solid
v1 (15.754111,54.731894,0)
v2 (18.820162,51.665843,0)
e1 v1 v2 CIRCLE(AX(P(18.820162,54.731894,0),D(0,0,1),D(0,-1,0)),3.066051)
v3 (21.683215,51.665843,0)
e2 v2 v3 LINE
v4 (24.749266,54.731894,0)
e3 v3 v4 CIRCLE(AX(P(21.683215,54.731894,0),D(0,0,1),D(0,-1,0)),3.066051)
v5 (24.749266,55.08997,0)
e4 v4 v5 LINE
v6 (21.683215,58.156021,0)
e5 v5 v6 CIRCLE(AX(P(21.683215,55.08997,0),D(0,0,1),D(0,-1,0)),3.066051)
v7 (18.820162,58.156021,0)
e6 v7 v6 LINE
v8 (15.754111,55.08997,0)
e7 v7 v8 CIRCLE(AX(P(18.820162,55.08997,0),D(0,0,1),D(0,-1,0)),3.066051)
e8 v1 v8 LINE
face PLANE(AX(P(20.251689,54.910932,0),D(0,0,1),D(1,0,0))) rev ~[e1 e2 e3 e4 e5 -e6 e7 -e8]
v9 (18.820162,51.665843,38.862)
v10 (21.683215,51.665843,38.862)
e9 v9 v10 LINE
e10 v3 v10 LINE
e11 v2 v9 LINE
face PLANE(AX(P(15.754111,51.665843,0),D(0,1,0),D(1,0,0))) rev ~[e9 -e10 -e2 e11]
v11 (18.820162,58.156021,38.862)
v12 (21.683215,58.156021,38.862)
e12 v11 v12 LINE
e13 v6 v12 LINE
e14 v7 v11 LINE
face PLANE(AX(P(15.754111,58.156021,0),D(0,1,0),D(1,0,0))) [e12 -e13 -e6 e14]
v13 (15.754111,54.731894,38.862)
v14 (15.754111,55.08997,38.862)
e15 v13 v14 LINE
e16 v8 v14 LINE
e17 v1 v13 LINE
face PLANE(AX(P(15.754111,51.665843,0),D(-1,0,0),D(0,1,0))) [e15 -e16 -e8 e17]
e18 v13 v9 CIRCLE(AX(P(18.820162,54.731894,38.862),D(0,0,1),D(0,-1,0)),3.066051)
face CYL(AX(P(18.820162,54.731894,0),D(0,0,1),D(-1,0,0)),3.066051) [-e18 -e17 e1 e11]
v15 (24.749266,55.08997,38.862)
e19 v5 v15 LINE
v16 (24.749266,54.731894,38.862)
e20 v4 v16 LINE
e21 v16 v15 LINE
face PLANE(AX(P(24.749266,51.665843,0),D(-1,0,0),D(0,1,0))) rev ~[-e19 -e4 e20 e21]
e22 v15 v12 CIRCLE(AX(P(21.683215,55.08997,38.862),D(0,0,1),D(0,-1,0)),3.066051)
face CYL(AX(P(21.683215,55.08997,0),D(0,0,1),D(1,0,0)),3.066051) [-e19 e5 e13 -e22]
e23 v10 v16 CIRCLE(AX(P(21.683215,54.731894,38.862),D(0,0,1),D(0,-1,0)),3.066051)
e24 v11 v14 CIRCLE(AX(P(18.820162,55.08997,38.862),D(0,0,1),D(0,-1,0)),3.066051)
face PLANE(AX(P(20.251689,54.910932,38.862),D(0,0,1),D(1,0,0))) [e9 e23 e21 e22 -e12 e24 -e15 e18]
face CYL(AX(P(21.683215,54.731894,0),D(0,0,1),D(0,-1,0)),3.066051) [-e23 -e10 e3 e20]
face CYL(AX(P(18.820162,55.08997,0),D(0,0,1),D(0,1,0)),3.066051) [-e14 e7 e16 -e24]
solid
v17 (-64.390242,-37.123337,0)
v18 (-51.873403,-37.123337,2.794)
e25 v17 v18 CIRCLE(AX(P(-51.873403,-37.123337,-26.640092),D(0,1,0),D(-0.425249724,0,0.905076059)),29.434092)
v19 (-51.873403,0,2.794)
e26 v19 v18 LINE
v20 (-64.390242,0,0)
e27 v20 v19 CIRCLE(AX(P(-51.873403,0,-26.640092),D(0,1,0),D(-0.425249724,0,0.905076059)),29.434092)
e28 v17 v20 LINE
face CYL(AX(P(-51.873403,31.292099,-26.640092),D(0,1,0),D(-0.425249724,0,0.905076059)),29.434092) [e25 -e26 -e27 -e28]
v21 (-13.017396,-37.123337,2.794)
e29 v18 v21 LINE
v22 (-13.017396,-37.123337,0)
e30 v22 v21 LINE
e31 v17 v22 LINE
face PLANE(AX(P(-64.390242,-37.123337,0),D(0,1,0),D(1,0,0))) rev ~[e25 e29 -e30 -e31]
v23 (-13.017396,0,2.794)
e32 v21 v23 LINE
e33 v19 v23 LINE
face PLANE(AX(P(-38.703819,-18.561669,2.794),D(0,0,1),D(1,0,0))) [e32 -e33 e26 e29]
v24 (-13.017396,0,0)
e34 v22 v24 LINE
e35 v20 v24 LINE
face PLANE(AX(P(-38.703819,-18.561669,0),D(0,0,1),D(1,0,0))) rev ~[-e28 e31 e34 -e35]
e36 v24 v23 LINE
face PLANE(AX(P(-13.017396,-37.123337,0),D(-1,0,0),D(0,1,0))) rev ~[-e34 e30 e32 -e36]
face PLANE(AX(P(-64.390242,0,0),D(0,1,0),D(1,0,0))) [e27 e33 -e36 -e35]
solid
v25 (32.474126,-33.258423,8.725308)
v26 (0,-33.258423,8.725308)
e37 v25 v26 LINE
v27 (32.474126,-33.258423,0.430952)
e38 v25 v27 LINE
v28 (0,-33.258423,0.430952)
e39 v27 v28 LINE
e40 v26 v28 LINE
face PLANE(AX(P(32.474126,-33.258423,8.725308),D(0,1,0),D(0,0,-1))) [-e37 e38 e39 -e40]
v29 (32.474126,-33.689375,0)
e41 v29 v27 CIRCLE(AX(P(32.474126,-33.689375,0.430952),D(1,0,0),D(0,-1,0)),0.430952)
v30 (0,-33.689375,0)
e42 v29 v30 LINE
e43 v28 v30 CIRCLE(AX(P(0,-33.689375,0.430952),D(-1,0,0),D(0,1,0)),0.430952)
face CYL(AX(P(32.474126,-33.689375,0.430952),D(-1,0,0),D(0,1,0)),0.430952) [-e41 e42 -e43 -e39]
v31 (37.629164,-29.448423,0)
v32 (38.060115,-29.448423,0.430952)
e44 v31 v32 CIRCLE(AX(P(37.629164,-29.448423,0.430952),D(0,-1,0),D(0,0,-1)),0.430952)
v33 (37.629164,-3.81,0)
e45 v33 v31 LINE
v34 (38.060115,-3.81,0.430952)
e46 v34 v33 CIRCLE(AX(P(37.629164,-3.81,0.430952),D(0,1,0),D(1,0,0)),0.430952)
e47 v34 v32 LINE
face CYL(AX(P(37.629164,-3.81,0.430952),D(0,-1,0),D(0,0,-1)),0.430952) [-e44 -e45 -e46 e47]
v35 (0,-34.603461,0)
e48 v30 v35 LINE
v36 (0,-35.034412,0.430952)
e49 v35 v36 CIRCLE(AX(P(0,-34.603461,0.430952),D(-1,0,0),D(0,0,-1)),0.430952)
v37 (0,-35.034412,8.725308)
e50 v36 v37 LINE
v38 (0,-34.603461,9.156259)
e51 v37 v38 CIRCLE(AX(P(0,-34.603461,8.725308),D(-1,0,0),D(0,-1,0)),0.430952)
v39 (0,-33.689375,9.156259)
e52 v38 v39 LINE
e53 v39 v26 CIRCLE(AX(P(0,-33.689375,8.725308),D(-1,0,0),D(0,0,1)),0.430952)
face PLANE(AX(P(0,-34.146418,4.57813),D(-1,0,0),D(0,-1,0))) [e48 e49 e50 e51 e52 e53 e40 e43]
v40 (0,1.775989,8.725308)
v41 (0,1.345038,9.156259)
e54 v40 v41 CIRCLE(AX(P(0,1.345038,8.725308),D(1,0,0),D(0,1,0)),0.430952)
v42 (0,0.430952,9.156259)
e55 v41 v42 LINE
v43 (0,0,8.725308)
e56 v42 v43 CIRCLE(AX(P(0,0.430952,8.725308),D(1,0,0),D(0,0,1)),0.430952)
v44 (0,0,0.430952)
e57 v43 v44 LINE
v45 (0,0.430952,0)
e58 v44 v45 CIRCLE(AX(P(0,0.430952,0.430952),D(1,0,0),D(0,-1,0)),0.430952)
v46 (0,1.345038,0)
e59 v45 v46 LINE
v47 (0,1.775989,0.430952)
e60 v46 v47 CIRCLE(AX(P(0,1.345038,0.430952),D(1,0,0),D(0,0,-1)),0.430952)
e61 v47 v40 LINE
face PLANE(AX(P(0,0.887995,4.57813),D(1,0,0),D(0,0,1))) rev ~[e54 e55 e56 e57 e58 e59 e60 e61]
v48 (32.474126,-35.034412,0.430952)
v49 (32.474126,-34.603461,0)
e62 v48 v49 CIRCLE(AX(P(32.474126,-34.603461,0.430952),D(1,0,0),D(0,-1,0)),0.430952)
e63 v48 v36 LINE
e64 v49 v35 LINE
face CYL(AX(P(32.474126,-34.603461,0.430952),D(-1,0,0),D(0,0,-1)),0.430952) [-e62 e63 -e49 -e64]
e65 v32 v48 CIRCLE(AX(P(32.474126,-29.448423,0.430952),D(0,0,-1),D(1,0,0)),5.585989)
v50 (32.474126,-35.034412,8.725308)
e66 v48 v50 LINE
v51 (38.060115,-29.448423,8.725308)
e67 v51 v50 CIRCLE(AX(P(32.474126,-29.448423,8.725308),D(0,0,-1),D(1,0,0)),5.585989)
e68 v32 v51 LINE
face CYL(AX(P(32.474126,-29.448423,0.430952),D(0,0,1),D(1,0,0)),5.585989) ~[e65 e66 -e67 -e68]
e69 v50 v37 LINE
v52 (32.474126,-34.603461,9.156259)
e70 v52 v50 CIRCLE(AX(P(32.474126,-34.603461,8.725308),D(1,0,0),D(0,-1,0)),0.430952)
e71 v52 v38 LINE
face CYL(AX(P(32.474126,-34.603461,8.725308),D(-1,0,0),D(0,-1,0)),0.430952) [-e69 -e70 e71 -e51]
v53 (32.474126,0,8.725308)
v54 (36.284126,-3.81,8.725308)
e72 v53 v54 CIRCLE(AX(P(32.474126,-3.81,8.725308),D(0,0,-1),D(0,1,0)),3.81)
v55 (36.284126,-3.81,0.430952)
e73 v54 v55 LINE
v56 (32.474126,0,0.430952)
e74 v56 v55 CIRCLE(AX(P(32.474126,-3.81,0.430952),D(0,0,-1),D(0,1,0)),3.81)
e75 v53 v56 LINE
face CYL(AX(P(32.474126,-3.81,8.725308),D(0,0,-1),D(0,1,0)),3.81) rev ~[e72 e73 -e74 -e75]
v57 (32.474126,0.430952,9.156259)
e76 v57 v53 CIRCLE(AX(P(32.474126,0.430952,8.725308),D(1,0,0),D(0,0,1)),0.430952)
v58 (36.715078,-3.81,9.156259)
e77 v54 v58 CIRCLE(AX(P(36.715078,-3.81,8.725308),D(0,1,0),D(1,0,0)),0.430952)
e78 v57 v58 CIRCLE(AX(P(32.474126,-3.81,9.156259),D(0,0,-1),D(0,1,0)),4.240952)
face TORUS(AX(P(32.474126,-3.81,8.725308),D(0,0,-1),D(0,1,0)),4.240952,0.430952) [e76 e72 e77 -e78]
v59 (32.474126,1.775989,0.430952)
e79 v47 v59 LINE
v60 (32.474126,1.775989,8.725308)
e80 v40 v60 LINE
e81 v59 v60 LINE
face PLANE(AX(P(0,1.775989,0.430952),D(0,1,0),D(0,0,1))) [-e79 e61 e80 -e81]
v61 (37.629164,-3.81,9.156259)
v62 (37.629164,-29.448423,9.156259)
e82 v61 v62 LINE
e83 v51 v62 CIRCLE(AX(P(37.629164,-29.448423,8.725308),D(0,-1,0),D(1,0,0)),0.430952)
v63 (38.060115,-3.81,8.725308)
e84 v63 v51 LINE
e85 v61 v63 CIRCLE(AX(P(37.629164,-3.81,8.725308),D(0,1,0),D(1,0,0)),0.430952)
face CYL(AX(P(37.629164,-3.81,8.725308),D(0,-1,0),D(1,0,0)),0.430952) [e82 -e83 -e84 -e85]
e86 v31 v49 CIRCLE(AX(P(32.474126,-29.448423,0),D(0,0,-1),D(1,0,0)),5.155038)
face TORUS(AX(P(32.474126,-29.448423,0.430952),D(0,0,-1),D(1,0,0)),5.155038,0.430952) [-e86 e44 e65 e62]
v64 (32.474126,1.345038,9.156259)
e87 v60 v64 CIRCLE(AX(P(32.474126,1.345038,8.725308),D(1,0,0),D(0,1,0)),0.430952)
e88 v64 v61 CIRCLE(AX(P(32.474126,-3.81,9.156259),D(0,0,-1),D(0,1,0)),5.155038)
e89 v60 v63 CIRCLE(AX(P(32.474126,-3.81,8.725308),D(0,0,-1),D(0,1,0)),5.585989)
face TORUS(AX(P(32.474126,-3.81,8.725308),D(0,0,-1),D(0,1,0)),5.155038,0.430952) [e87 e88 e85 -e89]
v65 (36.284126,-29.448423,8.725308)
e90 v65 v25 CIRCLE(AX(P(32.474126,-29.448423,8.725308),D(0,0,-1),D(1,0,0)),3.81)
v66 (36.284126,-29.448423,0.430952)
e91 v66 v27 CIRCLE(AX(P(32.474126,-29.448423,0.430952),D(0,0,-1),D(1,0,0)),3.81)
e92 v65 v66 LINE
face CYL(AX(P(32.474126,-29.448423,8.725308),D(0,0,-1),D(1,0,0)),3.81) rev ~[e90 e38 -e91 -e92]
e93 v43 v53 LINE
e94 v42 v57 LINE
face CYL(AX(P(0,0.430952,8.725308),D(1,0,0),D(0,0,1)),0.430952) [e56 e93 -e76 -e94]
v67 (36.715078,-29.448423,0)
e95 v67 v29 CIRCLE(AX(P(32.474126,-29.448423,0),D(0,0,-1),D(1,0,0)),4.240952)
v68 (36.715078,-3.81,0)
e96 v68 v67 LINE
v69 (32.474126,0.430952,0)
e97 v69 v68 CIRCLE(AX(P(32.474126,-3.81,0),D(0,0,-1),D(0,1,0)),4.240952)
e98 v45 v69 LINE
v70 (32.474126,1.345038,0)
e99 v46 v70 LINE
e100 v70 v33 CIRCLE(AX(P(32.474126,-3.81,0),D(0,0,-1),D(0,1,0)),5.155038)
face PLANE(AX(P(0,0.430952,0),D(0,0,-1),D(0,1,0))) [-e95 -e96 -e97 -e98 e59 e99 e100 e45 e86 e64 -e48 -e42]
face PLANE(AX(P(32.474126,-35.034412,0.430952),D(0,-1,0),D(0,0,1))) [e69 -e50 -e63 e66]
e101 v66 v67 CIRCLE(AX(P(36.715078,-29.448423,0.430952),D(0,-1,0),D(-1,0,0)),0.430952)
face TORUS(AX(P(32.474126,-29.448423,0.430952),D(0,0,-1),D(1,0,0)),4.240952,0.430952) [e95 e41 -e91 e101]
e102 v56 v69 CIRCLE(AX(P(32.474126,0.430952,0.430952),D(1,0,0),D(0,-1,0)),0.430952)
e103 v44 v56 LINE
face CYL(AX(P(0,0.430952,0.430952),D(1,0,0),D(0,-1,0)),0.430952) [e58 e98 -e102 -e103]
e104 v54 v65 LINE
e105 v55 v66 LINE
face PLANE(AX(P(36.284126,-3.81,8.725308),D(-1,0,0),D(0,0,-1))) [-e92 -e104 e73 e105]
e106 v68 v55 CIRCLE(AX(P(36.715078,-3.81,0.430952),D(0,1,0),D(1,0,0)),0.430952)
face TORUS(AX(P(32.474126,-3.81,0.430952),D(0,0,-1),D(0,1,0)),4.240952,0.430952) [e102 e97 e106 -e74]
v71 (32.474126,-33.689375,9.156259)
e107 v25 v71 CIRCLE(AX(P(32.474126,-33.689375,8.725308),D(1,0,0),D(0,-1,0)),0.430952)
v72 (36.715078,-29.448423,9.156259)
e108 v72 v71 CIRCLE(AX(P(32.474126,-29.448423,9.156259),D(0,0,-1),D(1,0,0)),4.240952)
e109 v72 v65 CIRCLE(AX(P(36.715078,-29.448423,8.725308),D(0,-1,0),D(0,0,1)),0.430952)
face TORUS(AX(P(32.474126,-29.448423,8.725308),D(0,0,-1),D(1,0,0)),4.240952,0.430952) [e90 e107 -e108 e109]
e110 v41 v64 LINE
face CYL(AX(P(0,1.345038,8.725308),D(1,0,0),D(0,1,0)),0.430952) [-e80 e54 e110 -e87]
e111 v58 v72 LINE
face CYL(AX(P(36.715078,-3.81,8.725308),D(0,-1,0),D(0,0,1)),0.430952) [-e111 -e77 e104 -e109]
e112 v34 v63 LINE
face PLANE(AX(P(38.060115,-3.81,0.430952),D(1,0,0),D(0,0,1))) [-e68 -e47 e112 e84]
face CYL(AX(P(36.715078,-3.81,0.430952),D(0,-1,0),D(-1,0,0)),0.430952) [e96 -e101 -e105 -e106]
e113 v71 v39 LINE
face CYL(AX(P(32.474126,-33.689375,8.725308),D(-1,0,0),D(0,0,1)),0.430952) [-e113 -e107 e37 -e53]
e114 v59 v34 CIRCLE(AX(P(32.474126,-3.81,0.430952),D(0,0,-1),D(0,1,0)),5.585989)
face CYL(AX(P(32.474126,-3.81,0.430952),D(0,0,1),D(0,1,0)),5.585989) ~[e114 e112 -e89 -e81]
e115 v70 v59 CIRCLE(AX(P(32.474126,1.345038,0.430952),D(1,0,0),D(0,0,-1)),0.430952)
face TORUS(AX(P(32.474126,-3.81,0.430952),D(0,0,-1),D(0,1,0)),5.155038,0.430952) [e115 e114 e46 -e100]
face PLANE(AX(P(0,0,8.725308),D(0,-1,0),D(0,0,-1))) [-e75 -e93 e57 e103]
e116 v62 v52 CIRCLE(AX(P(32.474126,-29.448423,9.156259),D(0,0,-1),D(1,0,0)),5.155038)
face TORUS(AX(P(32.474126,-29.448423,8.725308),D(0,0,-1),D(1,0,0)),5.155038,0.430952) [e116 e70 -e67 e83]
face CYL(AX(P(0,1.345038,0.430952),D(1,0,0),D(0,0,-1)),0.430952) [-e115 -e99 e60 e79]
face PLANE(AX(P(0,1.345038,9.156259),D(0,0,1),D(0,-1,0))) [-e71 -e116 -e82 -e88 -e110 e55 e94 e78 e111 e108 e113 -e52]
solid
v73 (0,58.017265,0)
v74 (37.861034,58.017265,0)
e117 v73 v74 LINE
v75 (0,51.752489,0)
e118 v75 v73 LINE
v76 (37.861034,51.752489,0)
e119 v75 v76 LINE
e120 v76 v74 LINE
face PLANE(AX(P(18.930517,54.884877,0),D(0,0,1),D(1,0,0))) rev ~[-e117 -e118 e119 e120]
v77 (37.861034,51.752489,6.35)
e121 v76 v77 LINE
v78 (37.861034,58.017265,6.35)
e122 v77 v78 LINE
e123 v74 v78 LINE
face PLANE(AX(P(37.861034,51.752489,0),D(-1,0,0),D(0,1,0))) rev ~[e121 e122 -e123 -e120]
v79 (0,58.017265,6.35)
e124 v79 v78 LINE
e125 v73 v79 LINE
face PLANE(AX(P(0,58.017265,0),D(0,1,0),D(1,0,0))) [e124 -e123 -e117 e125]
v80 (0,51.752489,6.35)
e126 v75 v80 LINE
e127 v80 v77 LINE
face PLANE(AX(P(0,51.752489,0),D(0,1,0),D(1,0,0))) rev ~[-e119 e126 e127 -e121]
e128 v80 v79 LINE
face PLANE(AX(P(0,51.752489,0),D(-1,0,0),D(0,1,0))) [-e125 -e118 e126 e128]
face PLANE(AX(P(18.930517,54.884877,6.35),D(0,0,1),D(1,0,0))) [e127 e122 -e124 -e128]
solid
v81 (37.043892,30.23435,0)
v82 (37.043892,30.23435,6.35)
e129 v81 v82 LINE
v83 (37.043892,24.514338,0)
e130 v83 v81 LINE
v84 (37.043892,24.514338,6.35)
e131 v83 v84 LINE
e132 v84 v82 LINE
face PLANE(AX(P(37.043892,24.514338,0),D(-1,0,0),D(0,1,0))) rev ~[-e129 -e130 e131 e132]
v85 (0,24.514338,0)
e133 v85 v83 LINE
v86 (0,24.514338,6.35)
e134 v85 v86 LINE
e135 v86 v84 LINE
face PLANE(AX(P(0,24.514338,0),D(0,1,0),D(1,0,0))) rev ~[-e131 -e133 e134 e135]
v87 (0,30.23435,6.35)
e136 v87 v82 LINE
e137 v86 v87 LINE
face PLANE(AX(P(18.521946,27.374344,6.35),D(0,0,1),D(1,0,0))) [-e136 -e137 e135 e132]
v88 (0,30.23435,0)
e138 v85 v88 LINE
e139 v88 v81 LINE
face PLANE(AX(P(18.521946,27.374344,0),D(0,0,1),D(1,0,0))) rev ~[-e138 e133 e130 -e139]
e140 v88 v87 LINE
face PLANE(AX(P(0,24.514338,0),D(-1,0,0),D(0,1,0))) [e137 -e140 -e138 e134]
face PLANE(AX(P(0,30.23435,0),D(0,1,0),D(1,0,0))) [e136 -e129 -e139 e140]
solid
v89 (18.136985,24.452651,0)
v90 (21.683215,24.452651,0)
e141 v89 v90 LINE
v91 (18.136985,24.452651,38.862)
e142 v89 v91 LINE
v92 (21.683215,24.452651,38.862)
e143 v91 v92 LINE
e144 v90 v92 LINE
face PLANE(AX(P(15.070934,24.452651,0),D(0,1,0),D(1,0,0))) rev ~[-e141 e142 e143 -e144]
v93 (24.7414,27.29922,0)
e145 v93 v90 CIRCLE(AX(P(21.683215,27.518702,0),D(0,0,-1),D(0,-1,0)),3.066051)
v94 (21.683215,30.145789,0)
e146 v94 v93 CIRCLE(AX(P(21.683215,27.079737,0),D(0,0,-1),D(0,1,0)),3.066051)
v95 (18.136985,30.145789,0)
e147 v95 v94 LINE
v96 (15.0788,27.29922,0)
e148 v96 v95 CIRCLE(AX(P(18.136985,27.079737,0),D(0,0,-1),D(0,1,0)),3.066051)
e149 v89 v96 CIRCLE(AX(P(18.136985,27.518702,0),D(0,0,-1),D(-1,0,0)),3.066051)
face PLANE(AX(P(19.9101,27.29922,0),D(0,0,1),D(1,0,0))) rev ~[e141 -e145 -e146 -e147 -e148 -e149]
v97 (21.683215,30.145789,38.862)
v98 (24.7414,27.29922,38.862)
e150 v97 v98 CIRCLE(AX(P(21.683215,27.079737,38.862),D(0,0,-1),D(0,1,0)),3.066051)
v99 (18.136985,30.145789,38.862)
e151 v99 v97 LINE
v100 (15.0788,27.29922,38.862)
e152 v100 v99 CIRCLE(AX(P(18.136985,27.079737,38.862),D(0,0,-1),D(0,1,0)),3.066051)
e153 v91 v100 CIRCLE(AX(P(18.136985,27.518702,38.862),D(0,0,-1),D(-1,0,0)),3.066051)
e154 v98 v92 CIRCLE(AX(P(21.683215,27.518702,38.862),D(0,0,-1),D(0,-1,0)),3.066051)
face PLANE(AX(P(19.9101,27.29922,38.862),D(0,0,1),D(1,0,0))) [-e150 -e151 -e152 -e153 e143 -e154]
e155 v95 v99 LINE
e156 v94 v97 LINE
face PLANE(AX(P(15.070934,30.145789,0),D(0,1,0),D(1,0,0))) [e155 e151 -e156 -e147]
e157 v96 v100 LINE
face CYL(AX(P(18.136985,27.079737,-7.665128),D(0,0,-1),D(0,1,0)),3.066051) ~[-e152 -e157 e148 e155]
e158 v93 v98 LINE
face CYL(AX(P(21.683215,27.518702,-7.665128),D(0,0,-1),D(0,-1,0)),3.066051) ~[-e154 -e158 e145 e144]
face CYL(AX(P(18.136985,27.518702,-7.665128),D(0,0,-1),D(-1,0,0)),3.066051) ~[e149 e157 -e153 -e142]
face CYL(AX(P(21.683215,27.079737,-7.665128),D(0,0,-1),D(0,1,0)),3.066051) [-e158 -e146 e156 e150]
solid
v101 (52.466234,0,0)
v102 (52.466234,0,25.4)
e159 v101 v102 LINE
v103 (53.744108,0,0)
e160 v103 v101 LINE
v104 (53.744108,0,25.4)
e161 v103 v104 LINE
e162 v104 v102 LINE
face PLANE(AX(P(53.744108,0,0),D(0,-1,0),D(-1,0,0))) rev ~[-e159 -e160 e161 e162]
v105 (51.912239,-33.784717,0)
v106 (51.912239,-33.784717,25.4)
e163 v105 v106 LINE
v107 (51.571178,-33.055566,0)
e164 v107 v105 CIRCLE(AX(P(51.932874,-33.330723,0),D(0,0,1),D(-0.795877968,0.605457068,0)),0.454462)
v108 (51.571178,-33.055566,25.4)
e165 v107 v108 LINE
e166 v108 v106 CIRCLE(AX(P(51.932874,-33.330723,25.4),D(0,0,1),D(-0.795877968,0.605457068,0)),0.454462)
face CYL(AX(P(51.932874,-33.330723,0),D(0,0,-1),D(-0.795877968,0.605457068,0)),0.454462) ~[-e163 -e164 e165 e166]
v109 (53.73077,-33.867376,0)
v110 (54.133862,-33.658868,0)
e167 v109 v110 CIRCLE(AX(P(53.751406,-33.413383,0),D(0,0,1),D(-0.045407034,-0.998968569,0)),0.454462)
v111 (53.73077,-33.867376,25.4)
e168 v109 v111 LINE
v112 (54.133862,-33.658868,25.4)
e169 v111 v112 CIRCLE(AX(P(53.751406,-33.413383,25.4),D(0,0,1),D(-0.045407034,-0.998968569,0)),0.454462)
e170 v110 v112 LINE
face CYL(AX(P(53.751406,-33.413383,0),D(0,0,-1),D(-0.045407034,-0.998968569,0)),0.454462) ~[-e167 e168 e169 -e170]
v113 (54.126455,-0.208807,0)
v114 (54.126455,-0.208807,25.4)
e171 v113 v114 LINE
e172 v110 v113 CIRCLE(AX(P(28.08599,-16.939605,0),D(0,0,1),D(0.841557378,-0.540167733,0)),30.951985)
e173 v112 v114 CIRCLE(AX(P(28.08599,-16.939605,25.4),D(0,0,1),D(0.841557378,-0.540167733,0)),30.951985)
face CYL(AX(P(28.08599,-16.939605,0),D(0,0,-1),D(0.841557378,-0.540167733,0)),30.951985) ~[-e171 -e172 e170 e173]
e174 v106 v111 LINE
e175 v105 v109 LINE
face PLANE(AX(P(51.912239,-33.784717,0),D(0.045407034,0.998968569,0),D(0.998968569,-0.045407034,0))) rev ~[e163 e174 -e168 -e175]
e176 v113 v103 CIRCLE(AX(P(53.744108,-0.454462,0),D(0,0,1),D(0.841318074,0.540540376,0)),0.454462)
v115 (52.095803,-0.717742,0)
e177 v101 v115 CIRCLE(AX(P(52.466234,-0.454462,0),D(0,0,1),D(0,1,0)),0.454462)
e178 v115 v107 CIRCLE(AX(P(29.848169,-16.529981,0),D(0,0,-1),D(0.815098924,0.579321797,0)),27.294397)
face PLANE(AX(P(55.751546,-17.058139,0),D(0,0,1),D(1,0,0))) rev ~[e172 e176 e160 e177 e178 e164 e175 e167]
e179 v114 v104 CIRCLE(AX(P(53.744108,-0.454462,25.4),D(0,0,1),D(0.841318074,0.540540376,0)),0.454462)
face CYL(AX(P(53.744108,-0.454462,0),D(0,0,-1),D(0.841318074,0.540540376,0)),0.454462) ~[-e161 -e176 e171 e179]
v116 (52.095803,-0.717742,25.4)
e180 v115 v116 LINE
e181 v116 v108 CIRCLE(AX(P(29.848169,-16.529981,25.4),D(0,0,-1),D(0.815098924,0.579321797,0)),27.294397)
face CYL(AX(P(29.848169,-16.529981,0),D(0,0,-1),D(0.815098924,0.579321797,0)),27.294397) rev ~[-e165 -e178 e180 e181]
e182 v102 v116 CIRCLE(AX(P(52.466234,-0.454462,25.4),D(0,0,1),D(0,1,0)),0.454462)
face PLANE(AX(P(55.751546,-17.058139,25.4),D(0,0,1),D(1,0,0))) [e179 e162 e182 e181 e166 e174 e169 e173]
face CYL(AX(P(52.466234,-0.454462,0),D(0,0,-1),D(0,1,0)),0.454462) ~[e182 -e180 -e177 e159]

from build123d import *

# Parameters (mm, degrees)
F5_DEPTH       = 25.4
F6_W           = 51.3728456572
F6_H           = 37.123337388
F7_DEPTH       = 2.794
F8_T1_DEPTH    = 99.7075344175
F9_W           = 37.8610342741
F9_H           = 6.2647759914
F10_DEPTH      = 6.35
F9_W_2         = 37.0438918471
F9_H_2         = 5.7200118899
F11_W          = 8.9951548725
F11_H          = 6.4901784062
F12_DEPTH      = 38.862
F11_W_2        = 9.6783321351
F11_H_2        = 5.6931376457
F13_F1_R       = 3.0660512242
F13_F2_R       = 3.0660512242
F13_F3_R       = 3.0660512242
F13_F4_R       = 3.0660512242
F13_2_T1_DEPTH = 54.1922561211


# Not quite as in the source:
# - a fillet or chamfer that OpenCascade refuses, or shapes differently, is made with other operations: its cross-section is extruded or revolved along the edge and cut away or added


with BuildPart() as f2:
    # F2: sweep along a path in F0
    with BuildLine(Plane.XY) as f2_path:
        Line((0, 0), (32.4741261244, 0))
        ThreePointArc((32.4741261244, 0), (35.1682029607, -1.1159231637), (36.2841261244, -3.81))
        Line((36.2841261244, -3.81), (36.2841261244, -29.4484232092))
        ThreePointArc((36.2841261244, -29.4484232092), (35.1682029607, -32.1425000455), (32.4741261244, -33.2584232092))
        Line((32.4741261244, -33.2584232092), (0, -33.2584232092))
    # F1 (on Right) → F2 (sweep)
    with BuildSketch(Plane.YZ):
        with BuildLine():
            Line((0, 8.7253075845), (0, 0.43095164))
            ThreePointArc((0, 0.43095164), (0.126222813, 0.126222813), (0.43095164, 0))
            Line((0.43095164, 0), (1.3450375525, 0))
            ThreePointArc((1.3450375525, 0), (1.6497663795, 0.126222813), (1.7759891925, 0.43095164))
            Line((1.7759891925, 0.43095164), (1.7759891925, 8.7253075845))
            ThreePointArc((1.7759891925, 8.7253075845), (1.6497663795, 9.0300364115), (1.3450375525, 9.1562592245))
            Line((1.3450375525, 9.1562592245), (0.43095164, 9.1562592245))
            ThreePointArc((0.43095164, 9.1562592245), (0.126222813, 9.0300364115), (0, 8.7253075845))
        make_face()
    sweep(path=f2_path.line)


with BuildPart() as f5:
    # F3 (on Top) → F5 (new body)
    with BuildSketch(Plane.XY):
        with BuildLine():
            ThreePointArc((53.7307702021, -33.8673758858), (53.9602055935, -33.8170389493), (54.1338617807, -33.658868362))
            ThreePointArc((54.1338617807, -33.658868362), (59.0379747248, -16.932750892), (54.1264548633, -0.2088069181))
            ThreePointArc((54.1264548633, -0.2088069181), (53.9619320492, -0.0556032477), (53.7441078084, 0))
            Line((53.7441078084, 0), (52.4662340509, 0))
            ThreePointArc((52.4662340509, 0), (52.0623861341, -0.2460332441), (52.0958026022, -0.7177416675))
            ThreePointArc((52.0958026022, -0.7177416675), (57.1389747881, -16.9727260502), (51.5711781882, -33.0555660979))
            ThreePointArc((51.5711781882, -33.0555660979), (51.5212198267, -33.5232749621), (51.9122386741, -33.7847165054))
            Line((51.9122386741, -33.7847165054), (53.7307702021, -33.8673758858))
        make_face()
    extrude(amount=F5_DEPTH)


with BuildPart() as f7:
    # F6 (on Top) → F7 (new body)
    with BuildSketch(Plane.XY):
        with Locations((-38.7038192712, -18.561668694)):
            Rectangle(F6_W, F6_H)
    extrude(amount=F7_DEPTH)

    # F8: fillet of radius 29.4340917525 on 1 edges, made by hand

    # F8_s2 → F8_t1 (cut)
    with BuildSketch(Plane.XZ.offset(-31.2920985147)):
        with BuildLine():
            ThreePointArc((-64.3902420998, 0), (-58.2858457679, 2.0870092345), (-51.8734026939, 2.794))
            Line((-51.8734026939, 2.794), (-64.3902420998, 2.794))
            Line((-64.3902420998, 2.794), (-64.3902420998, 0))
        make_face()
    extrude(amount=F8_T1_DEPTH, mode=Mode.SUBTRACT)


with BuildPart() as f10:
    # F9 (on Top) → F10 (new body)
    with BuildSketch(Plane.XY):
        with Locations((18.9305171371, 54.8848770559)):
            Rectangle(F9_W, F9_H)
    extrude(amount=F10_DEPTH)


with BuildPart() as f10b:
    # F9 (on Top) → F10, piece 2 (new body)
    with BuildSketch(Plane.XY):
        with Locations((18.5219459236, 27.3743439466)):
            Rectangle(F9_W_2, F9_H_2)
    extrude(amount=F10_DEPTH)


with BuildPart() as f12:
    # F11 (on Top) → F12 (new body)
    with BuildSketch(Plane.XY):
        with Locations((20.2516885474, 54.9109317362)):
            Rectangle(F11_W, F11_H)
    extrude(amount=F12_DEPTH)

    # F13: fillet of radius 3.0660512242 on 4 edges, made by hand

    # F13_f1
    f13_f1_edges = [f12.edges().sort_by_distance(p)[0] for p in [
        (24.7492659837, 58.1560209394, 19.431),
    ]]
    fillet(f13_f1_edges, radius=F13_F1_R)

    # F13_f2
    f13_f2_edges = [f12.edges().sort_by_distance(p)[0] for p in [
        (15.7541111112, 58.1560209394, 19.431),
    ]]
    fillet(f13_f2_edges, radius=F13_F2_R)

    # F13_f3
    f13_f3_edges = [f12.edges().sort_by_distance(p)[0] for p in [
        (15.7541111112, 51.6658425331, 19.431),
    ]]
    fillet(f13_f3_edges, radius=F13_F3_R)

    # F13_f4
    f13_f4_edges = [f12.edges().sort_by_distance(p)[0] for p in [
        (24.7492659837, 51.6658425331, 19.431),
    ]]
    fillet(f13_f4_edges, radius=F13_F4_R)


with BuildPart() as f12b:
    # F11 (on Top) → F12, piece 2 (new body)
    with BuildSketch(Plane.XY):
        with Locations((19.9100999162, 27.2992197424)):
            Rectangle(F11_W_2, F11_H_2)
    extrude(amount=F12_DEPTH)

    # F13#2: fillet of radius 3.0660512242 on 4 edges, made by hand

    # F13_2_s2 → F13_2_t1 (cut)
    with BuildSketch(Plane.XY.offset(-7.6651280605)):
        with BuildLine():
            ThreePointArc((15.0709338486, 27.5187021438), (15.9689594607, 25.3506765317), (18.1369850728, 24.4526509196))
            Line((18.1369850728, 24.4526509196), (15.0709338486, 24.4526509196))
            Line((15.0709338486, 24.4526509196), (15.0709338486, 27.5187021438))
        make_face()
        with BuildLine():
            ThreePointArc((21.6832147595, 24.4526509196), (23.8512403716, 25.3506765317), (24.7492659837, 27.5187021438))
            Line((24.7492659837, 27.5187021438), (24.7492659837, 24.4526509196))
            Line((24.7492659837, 24.4526509196), (21.6832147595, 24.4526509196))
        make_face()
        with BuildLine():
            ThreePointArc((21.6832147595, 30.1457885653), (23.8512403716, 29.2477629532), (24.7492659837, 27.0797373411))
            Line((24.7492659837, 27.0797373411), (24.7492659837, 30.1457885653))
            Line((24.7492659837, 30.1457885653), (21.6832147595, 30.1457885653))
        make_face()
        with BuildLine():
            ThreePointArc((18.1369850728, 30.1457885653), (15.9689594607, 29.2477629532), (15.0709338486, 27.0797373411))
            Line((15.0709338486, 27.0797373411), (15.0709338486, 30.1457885653))
            Line((15.0709338486, 30.1457885653), (18.1369850728, 30.1457885653))
        make_face()
    extrude(amount=F13_2_T1_DEPTH, mode=Mode.SUBTRACT)


solid = Compound([f2.part, f5.part, f7.part, f10.part, f10b.part, f12.part, f12b.part])
